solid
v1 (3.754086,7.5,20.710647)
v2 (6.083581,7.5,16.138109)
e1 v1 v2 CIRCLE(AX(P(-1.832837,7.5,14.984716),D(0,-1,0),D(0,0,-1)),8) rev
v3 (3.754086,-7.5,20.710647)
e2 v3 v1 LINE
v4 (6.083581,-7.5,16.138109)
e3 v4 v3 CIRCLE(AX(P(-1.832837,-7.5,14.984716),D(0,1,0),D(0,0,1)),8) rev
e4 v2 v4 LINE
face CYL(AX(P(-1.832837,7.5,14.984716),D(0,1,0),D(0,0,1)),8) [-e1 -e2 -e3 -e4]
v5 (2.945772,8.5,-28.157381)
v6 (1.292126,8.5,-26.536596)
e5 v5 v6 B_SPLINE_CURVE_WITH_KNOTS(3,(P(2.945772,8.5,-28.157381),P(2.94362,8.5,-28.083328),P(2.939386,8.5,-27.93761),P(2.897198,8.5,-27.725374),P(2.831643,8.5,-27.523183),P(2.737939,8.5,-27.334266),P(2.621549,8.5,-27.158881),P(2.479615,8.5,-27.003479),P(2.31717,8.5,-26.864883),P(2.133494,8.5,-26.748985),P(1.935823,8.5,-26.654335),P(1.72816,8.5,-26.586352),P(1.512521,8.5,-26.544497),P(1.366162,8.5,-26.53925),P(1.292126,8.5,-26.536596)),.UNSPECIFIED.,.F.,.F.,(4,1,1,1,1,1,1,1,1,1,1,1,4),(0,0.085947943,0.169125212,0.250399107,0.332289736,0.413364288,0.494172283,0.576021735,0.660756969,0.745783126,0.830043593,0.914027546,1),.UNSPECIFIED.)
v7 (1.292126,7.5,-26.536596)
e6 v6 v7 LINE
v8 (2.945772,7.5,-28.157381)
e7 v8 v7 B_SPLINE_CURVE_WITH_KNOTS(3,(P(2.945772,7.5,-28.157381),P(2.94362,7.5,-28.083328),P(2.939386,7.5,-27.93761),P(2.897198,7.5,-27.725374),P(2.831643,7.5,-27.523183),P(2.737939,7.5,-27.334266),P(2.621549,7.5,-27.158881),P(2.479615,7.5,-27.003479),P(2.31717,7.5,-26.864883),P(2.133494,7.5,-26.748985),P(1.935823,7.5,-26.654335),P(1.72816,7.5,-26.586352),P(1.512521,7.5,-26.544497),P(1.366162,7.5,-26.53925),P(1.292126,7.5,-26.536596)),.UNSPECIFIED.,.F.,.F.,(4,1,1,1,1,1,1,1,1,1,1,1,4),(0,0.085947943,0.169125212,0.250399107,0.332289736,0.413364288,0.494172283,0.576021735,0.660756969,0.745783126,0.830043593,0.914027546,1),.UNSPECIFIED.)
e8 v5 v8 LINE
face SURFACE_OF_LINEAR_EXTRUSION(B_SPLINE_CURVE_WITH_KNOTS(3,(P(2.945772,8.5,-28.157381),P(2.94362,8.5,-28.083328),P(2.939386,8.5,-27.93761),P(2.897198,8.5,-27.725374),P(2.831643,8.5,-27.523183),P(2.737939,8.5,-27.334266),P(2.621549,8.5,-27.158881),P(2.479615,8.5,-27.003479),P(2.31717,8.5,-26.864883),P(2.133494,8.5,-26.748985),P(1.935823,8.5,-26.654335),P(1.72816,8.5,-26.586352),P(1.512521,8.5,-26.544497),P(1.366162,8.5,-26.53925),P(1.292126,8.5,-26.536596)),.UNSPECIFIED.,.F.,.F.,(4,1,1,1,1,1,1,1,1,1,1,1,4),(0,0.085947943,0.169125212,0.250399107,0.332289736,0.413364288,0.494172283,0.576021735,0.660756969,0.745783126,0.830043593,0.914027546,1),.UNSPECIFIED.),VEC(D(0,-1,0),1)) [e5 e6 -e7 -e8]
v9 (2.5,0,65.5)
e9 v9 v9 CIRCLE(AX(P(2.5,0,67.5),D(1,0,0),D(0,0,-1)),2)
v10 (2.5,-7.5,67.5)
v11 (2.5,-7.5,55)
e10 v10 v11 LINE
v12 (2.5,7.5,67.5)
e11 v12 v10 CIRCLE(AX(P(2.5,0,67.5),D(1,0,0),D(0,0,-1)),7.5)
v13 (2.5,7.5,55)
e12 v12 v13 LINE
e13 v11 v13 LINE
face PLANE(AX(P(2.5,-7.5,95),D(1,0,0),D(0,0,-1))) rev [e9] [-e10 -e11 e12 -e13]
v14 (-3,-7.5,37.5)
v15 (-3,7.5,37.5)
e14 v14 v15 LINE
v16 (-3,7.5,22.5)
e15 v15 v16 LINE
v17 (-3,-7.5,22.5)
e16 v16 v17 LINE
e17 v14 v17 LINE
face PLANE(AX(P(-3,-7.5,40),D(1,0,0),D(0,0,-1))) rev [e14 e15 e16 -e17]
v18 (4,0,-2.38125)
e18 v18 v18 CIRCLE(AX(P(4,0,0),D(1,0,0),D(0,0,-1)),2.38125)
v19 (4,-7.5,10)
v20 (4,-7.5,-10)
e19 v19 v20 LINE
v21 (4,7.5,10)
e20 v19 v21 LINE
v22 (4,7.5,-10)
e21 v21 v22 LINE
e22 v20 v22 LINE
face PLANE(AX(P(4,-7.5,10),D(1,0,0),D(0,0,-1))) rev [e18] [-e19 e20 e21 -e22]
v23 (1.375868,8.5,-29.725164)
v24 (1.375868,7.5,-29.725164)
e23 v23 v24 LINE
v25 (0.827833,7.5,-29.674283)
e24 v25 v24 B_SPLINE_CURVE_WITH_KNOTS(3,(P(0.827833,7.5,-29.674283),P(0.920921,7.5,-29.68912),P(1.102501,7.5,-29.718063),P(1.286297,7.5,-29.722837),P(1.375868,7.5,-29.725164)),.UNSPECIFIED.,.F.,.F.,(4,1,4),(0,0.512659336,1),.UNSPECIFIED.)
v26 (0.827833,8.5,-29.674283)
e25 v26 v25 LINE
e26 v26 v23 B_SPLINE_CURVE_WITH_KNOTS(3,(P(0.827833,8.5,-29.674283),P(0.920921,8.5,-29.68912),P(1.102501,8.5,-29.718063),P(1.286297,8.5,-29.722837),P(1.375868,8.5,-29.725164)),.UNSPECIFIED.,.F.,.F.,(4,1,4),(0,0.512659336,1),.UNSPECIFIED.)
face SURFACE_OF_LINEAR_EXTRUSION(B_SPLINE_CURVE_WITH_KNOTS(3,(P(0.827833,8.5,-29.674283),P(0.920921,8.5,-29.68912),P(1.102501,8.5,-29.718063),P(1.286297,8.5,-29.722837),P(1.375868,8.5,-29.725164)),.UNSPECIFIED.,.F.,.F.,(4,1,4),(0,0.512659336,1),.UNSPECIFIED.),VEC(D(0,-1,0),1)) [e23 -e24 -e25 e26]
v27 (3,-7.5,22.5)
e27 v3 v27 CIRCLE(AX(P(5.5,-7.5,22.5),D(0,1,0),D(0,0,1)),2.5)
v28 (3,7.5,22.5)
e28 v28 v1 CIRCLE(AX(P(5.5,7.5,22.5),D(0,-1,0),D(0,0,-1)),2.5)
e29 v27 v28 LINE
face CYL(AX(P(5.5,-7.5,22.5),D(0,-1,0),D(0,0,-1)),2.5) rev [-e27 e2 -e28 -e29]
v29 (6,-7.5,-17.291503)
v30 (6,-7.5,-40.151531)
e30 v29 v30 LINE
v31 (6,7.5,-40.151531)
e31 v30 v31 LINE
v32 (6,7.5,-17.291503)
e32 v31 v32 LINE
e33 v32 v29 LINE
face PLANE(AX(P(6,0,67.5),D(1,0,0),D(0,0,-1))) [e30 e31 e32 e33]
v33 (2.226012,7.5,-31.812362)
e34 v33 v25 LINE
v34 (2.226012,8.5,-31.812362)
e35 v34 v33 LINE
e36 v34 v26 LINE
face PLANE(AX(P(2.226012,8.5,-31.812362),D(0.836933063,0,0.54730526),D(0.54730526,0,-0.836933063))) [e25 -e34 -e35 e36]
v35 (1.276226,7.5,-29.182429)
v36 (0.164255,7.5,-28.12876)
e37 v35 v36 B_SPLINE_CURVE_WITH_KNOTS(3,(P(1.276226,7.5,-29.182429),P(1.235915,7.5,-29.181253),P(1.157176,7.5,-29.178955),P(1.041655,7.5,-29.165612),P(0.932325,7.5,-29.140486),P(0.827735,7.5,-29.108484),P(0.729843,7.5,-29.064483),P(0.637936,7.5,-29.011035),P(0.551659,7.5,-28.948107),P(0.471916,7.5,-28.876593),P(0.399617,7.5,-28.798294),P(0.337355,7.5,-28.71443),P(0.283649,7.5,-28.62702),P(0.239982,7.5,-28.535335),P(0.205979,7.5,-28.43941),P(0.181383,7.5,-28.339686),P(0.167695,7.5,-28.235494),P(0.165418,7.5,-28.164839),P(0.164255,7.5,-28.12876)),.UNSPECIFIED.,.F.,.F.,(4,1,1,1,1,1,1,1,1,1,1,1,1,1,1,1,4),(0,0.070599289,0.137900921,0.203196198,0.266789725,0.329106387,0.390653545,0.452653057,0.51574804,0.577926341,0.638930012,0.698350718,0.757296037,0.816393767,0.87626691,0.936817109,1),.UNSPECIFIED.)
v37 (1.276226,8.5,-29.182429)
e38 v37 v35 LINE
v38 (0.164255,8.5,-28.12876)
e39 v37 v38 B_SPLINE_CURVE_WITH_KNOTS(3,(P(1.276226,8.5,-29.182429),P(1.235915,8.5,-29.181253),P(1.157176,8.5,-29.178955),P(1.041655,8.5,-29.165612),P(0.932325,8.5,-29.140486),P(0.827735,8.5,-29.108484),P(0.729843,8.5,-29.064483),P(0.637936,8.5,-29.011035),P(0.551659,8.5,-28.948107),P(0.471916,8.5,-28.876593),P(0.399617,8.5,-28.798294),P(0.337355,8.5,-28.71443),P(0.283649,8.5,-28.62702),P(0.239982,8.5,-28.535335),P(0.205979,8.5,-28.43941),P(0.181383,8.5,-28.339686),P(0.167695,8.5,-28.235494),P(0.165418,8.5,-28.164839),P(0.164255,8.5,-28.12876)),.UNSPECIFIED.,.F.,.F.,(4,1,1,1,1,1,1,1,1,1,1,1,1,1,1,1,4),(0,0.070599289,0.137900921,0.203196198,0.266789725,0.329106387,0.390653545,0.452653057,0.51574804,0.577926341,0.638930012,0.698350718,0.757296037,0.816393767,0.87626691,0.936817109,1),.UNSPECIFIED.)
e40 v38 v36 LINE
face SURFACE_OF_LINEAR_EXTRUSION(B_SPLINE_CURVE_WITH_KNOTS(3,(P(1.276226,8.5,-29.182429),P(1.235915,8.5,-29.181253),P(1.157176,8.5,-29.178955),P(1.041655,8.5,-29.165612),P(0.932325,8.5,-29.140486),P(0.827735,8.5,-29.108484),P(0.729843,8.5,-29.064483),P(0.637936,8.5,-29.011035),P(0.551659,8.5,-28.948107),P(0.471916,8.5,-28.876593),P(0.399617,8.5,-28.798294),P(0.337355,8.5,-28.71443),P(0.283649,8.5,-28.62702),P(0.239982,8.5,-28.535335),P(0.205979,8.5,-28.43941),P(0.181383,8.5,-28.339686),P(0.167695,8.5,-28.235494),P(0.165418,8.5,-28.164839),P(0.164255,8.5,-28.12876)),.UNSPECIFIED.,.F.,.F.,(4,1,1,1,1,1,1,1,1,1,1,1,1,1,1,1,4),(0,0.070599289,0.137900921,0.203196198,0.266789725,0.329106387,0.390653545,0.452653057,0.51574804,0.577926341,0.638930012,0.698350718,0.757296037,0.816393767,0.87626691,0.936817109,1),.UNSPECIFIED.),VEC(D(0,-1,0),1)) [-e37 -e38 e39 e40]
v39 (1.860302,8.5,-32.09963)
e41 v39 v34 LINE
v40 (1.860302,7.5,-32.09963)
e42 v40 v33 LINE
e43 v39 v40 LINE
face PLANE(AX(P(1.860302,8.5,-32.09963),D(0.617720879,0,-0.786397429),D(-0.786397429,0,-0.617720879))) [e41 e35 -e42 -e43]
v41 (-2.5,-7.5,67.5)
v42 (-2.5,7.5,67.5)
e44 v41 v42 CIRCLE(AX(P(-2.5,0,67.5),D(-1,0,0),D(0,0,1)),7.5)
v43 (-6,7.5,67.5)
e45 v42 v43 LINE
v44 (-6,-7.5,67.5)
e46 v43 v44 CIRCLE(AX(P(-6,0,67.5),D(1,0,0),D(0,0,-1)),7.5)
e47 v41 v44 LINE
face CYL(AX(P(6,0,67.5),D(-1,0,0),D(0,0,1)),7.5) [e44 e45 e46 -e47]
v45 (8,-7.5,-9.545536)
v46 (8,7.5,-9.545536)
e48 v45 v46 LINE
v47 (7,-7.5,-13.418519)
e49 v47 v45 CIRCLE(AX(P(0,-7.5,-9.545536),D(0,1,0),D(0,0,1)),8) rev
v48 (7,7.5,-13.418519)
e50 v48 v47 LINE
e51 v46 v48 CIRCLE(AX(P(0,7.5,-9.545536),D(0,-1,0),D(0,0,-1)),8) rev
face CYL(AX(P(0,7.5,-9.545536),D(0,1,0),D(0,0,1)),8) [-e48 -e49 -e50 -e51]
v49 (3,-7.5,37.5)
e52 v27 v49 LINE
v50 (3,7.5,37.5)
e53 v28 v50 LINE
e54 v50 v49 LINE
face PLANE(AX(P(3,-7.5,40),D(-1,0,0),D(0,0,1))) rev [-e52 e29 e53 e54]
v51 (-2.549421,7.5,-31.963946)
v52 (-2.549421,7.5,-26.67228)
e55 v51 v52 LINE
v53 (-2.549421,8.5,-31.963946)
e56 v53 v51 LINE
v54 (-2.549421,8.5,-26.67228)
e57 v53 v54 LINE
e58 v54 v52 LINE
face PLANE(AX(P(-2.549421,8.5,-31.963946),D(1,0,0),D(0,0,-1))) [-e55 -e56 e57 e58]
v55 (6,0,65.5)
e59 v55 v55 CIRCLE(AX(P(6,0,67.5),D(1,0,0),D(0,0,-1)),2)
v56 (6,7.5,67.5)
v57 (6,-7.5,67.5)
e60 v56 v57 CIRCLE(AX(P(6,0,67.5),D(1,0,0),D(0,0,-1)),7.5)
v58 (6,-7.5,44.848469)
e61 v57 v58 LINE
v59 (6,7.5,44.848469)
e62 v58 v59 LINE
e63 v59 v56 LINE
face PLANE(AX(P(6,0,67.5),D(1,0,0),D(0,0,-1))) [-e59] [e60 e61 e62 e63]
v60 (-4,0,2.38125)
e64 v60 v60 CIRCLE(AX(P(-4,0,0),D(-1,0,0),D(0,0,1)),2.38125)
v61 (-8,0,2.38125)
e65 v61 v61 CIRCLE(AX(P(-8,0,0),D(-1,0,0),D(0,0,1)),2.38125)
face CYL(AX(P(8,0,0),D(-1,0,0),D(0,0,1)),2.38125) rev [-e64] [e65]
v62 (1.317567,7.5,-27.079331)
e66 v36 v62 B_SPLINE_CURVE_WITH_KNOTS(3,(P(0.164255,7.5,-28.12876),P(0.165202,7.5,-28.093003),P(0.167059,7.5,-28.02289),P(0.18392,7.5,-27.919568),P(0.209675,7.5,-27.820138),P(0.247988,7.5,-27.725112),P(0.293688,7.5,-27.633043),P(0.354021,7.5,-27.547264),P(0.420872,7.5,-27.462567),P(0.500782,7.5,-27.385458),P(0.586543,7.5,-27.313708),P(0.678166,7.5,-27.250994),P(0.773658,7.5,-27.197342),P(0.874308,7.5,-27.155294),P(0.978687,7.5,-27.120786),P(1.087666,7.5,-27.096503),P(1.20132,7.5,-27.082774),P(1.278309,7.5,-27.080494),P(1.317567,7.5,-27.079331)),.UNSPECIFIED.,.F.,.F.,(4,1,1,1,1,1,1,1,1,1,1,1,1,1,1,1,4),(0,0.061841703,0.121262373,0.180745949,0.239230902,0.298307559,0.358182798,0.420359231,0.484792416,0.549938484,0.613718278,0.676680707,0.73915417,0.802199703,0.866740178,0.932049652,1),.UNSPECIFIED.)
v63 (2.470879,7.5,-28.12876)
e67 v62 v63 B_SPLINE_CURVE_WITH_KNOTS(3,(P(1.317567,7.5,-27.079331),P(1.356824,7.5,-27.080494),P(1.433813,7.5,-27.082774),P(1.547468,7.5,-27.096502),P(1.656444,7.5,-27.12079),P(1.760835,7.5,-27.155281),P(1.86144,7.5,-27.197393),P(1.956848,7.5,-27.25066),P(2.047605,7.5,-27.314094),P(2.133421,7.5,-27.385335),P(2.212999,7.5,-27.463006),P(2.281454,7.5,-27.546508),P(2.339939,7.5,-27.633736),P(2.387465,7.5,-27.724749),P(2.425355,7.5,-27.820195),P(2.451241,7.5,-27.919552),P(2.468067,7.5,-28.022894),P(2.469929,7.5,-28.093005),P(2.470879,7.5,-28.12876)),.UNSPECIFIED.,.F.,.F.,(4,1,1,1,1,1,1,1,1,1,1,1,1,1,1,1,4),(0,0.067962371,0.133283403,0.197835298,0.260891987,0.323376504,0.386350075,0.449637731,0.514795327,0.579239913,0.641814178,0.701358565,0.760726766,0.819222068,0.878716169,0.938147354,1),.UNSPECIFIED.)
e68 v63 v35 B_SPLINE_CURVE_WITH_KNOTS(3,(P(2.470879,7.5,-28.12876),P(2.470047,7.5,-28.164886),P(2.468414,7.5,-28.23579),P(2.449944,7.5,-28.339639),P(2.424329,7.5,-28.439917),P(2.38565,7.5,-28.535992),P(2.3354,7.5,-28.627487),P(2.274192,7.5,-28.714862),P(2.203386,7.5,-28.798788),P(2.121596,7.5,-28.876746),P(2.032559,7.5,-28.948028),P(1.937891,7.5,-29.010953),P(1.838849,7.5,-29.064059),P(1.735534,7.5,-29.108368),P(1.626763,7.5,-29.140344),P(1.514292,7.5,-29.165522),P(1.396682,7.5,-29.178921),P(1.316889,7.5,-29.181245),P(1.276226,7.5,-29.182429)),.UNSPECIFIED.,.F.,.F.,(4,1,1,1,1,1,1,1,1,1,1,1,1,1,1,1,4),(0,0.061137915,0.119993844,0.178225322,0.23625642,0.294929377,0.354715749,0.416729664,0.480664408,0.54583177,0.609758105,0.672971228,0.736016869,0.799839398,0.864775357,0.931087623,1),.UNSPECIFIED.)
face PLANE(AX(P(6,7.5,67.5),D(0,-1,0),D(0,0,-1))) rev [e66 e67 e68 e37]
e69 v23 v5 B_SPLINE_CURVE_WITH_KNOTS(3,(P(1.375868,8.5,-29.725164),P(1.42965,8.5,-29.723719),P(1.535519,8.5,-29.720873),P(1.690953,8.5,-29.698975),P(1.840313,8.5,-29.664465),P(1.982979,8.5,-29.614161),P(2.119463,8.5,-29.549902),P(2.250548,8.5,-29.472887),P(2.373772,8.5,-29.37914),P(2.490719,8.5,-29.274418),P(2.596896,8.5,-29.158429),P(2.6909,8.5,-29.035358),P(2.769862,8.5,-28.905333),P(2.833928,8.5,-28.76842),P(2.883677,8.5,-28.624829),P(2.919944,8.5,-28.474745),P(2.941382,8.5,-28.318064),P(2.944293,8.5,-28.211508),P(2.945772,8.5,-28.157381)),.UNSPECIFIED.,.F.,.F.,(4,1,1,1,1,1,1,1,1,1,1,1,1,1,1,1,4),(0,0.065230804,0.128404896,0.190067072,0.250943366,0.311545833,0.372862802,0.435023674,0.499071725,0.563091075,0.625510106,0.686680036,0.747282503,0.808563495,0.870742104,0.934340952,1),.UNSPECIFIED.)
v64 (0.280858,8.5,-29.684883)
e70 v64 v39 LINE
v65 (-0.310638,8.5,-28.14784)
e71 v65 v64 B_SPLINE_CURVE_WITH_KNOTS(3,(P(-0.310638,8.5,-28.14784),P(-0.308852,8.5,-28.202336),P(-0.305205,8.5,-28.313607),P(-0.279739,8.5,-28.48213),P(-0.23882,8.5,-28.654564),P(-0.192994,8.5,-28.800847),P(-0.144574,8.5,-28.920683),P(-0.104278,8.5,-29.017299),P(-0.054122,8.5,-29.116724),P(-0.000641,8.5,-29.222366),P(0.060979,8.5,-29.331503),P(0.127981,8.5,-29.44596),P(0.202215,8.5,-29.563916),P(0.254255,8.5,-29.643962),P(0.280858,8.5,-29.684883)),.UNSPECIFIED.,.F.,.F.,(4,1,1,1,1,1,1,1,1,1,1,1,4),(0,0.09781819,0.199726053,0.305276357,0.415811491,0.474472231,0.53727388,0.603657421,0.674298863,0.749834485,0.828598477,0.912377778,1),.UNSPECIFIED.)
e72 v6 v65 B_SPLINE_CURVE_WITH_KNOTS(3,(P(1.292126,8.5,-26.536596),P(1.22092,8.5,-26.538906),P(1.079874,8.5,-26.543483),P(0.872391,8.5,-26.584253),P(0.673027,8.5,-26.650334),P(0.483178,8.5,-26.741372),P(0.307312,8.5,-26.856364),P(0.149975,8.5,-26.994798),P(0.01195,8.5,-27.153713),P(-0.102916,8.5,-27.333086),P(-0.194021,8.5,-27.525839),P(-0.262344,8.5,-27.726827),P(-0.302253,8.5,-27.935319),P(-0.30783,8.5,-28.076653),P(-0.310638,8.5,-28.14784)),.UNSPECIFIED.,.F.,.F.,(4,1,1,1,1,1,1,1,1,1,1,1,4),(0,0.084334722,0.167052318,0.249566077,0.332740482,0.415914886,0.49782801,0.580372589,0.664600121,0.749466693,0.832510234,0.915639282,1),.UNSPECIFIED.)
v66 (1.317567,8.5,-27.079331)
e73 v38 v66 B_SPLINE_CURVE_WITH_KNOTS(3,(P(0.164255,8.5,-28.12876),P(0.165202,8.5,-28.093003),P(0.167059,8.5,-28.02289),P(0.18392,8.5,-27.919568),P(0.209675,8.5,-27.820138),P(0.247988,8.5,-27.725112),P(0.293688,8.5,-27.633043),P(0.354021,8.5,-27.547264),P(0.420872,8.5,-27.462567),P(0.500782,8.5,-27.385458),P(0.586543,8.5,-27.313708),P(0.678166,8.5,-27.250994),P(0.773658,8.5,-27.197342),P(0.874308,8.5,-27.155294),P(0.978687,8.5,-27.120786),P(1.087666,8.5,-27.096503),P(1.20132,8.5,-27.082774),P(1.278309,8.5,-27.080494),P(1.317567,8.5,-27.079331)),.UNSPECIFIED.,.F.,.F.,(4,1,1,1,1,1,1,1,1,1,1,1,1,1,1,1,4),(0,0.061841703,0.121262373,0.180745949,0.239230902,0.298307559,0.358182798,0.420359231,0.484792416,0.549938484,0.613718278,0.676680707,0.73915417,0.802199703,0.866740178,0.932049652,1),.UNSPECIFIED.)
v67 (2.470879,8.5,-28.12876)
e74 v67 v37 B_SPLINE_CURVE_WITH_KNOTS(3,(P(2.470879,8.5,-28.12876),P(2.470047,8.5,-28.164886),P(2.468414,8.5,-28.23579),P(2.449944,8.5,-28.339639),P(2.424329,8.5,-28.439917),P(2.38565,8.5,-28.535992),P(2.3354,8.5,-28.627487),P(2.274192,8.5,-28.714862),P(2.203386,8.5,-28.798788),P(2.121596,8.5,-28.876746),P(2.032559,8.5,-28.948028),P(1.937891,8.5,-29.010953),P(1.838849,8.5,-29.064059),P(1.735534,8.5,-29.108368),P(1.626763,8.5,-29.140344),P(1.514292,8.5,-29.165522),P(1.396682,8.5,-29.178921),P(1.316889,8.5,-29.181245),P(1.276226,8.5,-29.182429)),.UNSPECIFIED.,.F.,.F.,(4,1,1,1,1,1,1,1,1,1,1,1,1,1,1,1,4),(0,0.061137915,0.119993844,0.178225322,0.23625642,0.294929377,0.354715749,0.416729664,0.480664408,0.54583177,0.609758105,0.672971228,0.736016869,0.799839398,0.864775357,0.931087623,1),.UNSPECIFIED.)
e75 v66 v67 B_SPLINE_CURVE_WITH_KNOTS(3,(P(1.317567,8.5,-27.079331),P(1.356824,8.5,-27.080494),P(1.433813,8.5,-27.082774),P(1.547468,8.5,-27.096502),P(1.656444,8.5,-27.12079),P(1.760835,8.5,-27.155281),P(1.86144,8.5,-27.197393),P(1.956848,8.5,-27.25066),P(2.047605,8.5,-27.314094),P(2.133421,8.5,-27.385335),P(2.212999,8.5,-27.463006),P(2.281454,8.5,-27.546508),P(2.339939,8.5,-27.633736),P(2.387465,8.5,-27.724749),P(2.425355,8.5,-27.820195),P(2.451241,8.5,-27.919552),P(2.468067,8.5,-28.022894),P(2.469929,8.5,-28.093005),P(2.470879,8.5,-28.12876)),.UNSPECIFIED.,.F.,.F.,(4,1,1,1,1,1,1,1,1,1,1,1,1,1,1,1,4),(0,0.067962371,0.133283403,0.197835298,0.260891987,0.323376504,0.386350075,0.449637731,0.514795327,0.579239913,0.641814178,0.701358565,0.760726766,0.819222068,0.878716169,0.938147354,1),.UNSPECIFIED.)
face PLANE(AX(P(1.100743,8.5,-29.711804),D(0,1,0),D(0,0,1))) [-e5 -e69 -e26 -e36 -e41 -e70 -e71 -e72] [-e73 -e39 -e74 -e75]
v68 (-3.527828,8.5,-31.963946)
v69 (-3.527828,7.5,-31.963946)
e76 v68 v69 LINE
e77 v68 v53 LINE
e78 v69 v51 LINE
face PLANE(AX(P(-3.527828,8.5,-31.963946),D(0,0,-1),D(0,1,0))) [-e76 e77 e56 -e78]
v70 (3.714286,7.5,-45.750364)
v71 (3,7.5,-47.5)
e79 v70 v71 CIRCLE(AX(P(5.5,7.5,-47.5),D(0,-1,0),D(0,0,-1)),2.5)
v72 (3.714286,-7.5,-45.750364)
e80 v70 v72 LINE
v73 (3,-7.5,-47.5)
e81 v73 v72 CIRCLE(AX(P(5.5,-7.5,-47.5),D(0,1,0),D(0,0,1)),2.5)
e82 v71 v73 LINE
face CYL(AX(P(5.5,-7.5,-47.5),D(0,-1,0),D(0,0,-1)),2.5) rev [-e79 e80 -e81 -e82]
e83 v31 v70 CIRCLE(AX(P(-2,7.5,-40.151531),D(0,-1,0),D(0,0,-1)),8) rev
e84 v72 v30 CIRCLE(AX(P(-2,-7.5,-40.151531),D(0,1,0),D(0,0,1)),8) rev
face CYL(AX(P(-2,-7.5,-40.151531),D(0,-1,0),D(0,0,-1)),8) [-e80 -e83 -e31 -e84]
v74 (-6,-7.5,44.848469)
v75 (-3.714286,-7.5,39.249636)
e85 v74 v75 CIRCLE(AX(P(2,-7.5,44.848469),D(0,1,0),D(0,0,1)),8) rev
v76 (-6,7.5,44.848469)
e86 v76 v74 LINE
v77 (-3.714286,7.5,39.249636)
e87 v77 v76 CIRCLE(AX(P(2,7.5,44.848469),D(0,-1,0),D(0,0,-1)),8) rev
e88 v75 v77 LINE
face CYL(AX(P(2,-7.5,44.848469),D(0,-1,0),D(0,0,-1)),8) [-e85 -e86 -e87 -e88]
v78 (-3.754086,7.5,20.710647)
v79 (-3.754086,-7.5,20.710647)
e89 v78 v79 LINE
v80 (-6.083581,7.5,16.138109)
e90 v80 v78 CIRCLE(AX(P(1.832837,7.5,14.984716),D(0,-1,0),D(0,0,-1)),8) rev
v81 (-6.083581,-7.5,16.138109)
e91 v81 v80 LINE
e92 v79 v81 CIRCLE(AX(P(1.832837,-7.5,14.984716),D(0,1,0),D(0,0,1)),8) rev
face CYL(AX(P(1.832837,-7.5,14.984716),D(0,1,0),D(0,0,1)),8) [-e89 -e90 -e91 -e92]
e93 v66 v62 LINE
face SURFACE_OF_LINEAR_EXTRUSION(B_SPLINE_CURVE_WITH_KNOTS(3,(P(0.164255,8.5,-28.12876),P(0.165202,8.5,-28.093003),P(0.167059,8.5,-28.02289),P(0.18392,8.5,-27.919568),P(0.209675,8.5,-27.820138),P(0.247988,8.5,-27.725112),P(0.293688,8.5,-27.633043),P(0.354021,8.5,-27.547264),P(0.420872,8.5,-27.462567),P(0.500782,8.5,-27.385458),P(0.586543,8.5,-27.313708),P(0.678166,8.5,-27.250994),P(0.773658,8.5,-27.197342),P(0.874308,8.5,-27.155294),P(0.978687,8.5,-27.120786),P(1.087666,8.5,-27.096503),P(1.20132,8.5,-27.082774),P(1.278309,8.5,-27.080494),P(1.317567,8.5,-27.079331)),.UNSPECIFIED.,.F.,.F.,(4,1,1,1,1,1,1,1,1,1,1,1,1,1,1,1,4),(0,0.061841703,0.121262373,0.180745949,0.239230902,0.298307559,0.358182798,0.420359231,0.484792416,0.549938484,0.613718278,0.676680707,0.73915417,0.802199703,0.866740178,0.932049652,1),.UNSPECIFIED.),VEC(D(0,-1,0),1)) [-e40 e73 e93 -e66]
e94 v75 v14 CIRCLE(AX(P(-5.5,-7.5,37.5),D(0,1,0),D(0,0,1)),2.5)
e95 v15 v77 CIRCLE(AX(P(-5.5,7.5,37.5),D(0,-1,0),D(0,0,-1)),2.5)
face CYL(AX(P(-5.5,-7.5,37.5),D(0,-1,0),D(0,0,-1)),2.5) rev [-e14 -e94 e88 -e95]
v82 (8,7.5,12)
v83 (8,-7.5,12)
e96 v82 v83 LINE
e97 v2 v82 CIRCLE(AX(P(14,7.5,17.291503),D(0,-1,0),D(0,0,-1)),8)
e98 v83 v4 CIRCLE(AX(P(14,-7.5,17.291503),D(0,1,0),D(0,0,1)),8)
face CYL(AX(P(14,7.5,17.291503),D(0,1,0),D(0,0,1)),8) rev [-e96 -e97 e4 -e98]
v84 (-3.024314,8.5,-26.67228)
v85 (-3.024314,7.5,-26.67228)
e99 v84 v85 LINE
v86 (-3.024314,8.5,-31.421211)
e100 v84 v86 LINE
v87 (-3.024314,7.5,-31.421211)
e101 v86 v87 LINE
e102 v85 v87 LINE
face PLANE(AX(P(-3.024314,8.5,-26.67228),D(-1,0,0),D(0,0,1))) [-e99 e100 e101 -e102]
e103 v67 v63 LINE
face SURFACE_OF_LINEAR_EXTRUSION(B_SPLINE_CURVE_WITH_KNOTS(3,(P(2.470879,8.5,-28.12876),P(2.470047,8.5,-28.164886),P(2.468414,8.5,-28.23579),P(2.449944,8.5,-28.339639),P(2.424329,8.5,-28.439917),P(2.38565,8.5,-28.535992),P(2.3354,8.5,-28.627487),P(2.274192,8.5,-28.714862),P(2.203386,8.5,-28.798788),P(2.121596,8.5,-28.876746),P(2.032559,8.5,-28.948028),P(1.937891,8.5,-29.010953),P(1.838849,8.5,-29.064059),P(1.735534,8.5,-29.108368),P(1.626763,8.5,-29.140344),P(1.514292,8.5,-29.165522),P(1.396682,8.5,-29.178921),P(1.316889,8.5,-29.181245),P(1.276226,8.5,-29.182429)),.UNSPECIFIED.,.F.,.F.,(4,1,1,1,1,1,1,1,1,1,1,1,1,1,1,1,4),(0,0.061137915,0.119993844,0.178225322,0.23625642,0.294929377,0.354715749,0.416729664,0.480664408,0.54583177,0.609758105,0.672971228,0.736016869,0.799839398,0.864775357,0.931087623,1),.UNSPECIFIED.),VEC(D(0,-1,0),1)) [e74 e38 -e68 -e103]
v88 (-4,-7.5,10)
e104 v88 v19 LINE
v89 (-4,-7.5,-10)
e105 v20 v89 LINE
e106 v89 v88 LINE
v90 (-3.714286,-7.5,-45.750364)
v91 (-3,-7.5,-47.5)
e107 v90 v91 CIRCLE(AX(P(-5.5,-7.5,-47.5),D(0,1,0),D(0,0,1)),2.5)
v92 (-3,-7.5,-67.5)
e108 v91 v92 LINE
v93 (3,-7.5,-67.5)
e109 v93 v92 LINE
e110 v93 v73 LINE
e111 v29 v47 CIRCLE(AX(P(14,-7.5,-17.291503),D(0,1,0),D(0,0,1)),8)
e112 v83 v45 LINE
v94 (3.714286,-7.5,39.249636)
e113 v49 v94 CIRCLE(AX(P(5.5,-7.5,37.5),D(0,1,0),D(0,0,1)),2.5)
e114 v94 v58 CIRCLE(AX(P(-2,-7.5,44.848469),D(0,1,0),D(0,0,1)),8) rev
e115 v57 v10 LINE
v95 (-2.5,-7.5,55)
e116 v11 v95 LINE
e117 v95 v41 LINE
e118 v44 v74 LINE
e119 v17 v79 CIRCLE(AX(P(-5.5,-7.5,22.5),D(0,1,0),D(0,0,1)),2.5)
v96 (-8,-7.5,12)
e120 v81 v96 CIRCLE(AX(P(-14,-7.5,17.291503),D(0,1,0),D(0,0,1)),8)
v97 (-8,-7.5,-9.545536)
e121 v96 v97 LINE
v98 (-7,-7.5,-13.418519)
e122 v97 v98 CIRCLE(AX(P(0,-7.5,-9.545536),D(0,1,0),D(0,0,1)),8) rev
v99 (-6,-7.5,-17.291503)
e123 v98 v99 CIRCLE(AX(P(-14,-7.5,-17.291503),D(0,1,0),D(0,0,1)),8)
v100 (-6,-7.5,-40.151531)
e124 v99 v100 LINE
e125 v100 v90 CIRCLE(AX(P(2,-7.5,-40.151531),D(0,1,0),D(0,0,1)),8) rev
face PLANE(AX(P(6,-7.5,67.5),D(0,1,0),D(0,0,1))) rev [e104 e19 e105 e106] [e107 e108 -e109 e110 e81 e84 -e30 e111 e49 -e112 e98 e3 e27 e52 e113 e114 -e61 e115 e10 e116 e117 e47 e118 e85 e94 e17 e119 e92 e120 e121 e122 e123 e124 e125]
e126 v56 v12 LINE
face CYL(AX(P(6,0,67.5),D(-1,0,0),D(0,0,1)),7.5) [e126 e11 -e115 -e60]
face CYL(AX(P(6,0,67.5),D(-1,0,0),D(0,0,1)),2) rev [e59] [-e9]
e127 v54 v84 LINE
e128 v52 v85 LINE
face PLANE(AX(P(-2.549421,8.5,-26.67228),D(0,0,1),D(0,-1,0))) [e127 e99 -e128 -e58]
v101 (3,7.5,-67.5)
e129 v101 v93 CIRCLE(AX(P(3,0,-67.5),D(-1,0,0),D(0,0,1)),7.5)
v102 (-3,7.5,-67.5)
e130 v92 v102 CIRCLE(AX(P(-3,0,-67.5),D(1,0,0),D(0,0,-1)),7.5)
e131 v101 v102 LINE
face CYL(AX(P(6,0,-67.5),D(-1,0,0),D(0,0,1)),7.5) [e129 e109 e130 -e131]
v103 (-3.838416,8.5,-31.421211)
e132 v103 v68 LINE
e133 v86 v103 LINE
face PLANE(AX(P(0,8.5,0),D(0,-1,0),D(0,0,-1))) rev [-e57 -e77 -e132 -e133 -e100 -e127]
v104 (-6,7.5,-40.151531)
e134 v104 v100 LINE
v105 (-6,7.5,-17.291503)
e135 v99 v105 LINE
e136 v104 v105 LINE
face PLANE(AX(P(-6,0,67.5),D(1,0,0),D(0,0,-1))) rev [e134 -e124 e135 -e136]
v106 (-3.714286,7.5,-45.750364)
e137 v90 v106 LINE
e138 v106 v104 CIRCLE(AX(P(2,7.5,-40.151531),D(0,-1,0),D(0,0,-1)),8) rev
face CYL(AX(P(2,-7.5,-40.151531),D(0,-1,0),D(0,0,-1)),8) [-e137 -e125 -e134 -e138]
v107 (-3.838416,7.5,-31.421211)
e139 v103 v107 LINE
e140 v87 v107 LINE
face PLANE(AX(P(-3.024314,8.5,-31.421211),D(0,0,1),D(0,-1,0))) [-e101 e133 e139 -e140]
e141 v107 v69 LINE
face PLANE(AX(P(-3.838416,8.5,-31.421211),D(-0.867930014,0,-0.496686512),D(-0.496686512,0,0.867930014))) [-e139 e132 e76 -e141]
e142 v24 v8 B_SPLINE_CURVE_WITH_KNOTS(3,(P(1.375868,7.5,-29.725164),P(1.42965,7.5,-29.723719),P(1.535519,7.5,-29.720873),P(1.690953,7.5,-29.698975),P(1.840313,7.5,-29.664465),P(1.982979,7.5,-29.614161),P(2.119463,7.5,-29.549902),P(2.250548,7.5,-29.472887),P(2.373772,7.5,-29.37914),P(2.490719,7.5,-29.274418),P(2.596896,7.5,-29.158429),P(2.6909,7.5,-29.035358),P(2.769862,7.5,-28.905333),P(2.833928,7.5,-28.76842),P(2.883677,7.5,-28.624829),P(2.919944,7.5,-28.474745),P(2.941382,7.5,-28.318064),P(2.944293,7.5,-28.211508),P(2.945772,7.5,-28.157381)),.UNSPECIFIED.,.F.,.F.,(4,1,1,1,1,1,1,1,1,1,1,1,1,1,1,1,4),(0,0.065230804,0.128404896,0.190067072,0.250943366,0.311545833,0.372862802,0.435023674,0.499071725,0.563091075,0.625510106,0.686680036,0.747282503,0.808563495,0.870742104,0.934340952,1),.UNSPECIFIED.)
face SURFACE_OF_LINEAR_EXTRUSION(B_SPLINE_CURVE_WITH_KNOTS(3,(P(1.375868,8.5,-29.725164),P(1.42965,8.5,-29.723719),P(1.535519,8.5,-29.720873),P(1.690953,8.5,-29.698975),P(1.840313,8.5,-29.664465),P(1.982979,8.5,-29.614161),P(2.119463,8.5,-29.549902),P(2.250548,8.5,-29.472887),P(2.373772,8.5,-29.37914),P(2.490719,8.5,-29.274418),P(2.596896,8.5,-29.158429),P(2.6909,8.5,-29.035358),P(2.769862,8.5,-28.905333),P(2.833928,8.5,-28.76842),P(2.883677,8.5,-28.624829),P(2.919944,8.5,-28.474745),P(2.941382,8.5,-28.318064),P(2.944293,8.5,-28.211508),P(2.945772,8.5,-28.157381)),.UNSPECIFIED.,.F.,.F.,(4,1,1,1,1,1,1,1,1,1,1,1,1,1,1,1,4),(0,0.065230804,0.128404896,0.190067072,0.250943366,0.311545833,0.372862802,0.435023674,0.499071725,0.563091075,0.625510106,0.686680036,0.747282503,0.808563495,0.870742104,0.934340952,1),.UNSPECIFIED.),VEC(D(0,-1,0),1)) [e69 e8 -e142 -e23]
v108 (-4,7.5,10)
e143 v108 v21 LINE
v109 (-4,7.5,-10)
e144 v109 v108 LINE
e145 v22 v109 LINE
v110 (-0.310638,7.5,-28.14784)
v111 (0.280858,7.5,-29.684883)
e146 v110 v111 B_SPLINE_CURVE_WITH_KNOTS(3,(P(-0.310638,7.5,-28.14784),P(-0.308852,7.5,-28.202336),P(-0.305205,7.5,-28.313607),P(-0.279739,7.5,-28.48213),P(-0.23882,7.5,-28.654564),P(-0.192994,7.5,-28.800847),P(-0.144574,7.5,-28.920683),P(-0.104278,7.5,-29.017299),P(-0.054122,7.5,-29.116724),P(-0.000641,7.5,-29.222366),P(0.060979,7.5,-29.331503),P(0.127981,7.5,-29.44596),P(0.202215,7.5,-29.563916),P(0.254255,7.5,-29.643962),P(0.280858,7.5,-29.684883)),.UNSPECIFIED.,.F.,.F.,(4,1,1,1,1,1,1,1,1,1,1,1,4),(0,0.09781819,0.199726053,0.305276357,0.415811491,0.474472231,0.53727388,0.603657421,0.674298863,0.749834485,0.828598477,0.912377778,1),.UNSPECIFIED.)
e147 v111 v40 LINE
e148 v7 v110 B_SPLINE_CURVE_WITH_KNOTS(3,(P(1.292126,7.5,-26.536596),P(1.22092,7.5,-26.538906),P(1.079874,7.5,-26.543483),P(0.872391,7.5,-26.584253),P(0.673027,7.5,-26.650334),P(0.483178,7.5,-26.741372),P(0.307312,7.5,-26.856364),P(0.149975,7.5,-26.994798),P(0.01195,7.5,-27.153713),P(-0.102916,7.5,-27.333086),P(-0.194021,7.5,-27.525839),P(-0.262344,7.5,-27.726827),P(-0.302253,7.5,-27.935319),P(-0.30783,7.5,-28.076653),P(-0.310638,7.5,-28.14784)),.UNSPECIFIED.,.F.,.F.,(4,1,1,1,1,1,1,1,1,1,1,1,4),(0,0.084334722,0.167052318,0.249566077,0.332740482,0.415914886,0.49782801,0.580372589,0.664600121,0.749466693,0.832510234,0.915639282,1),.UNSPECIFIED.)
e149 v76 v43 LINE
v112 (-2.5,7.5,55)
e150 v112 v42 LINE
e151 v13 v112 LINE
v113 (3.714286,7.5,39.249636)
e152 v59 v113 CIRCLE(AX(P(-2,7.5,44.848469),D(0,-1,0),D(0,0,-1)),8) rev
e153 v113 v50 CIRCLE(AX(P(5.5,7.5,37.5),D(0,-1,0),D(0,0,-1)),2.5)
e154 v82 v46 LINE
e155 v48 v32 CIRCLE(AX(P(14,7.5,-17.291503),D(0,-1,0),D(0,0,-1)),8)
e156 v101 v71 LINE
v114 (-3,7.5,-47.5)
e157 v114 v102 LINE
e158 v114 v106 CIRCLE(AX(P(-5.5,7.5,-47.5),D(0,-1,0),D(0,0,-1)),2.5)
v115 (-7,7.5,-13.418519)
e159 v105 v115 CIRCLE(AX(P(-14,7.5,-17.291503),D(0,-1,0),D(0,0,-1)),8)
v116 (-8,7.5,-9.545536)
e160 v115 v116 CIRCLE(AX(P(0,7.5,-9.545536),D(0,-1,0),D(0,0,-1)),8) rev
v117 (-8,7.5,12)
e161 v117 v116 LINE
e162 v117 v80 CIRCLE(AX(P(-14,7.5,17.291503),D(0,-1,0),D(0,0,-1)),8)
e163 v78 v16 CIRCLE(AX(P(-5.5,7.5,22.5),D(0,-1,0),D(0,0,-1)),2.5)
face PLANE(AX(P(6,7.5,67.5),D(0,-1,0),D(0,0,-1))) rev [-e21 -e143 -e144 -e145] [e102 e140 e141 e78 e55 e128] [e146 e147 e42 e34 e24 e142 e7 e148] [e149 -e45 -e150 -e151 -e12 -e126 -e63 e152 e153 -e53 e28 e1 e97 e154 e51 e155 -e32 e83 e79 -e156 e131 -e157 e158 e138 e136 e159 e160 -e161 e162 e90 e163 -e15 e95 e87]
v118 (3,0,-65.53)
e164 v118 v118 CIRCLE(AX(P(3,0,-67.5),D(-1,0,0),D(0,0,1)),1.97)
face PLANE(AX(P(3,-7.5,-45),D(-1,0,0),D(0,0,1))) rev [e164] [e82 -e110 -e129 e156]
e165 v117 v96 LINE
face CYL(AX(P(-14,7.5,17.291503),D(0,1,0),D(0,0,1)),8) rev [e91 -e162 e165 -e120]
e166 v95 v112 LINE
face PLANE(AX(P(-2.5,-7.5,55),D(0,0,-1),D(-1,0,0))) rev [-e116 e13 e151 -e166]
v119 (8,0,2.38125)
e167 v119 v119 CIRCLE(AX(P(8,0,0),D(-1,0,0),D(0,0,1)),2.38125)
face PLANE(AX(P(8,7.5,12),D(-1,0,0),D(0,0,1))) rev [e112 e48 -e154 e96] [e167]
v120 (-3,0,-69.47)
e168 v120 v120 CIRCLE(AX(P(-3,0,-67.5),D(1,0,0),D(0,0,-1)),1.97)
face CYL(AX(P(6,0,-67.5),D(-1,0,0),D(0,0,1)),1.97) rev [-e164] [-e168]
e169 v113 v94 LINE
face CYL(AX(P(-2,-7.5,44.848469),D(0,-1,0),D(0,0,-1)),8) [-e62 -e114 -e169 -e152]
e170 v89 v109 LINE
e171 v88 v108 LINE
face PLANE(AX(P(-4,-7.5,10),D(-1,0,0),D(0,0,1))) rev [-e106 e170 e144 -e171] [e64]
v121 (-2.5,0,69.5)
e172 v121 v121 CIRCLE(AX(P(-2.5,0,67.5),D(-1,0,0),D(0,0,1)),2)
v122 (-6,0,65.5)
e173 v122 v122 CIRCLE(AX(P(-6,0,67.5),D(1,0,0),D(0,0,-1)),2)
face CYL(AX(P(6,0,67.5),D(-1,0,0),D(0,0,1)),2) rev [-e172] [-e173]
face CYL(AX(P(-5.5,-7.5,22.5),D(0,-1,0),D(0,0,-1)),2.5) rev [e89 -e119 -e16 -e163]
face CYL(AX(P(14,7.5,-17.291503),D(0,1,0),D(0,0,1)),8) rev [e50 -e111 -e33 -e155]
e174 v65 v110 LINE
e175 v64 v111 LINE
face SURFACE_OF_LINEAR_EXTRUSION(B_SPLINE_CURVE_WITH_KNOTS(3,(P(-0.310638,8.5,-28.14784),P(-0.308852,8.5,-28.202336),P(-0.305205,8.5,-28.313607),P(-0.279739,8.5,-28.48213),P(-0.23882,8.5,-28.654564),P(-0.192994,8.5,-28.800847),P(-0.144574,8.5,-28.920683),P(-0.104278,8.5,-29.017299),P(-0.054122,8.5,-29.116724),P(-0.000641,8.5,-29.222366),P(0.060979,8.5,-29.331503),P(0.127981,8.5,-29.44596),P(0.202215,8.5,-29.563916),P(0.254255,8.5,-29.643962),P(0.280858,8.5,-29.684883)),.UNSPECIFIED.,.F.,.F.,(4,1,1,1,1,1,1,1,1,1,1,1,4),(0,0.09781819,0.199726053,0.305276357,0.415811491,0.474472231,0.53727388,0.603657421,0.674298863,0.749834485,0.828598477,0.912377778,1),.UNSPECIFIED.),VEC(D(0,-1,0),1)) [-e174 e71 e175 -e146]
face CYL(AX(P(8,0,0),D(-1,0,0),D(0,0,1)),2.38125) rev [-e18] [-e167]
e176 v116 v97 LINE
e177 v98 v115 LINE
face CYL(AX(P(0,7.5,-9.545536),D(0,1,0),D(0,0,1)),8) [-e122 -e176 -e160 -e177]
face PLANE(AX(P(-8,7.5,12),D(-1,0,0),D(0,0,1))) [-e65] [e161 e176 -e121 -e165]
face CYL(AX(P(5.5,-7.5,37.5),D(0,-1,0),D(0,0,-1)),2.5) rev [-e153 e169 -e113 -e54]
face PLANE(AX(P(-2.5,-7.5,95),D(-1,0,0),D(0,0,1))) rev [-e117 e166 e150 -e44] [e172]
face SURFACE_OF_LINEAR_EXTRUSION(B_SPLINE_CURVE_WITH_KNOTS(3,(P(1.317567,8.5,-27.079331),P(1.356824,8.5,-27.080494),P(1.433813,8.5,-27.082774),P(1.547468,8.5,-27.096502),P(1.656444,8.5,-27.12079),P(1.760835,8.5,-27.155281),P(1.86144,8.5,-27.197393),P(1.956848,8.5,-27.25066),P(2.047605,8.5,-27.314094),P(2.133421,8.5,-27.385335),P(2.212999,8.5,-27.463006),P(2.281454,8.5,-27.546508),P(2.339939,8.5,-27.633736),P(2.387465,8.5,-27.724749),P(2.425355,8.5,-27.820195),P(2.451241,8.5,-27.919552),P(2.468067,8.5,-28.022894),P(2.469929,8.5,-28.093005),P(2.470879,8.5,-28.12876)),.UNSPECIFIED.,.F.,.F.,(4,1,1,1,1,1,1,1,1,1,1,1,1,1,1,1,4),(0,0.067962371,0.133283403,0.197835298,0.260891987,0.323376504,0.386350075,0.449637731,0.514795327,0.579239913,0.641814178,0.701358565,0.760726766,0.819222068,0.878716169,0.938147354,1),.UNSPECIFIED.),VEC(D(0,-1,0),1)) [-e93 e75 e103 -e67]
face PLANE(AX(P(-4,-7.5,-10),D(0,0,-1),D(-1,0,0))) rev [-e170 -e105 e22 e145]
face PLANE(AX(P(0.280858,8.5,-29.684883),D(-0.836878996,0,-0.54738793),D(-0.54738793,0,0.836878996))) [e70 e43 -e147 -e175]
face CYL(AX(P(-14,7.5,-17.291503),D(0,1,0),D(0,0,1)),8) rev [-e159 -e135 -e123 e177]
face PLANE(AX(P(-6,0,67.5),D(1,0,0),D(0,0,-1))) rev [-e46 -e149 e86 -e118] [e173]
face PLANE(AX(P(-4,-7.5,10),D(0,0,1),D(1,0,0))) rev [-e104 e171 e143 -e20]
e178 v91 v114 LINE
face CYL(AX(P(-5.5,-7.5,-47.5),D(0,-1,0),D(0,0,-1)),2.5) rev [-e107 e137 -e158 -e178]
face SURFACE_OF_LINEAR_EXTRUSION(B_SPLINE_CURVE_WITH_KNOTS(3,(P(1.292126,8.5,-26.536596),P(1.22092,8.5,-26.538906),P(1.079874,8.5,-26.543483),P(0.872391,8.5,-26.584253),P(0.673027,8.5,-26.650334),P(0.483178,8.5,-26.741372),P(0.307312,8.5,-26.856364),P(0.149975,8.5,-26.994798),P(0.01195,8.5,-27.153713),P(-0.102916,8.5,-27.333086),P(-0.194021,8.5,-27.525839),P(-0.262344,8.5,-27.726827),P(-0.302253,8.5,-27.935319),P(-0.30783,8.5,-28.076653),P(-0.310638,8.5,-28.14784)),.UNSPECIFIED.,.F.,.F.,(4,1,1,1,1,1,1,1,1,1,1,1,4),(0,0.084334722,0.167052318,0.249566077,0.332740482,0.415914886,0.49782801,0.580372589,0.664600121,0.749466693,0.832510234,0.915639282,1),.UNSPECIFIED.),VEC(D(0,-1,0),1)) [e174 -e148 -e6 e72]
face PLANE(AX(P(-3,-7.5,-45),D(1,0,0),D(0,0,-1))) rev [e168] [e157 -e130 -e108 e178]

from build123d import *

# Parameters (mm, degrees)
SKETCH1_R           = 2
SKETCH1_R_2         = 2.38125
SKETCH1_R_3         = 1.97
BASE_DEPTH          = 6
ALL_CUTS_DEPTH      = 76.612498967
ALL_CUTS_DEPTH_BACK = 76.612498967
SKETCH2_W           = 5
SKETCH2_H           = 40
SKETCH2_W_2         = 6
SKETCH2_H_2         = 20
SKETCH2_H_3         = 30
SKETCH2_W_3         = 8
SKETCH3_W           = 16
SKETCH3_H           = 24
SKETCH3_W_2         = 8
SKETCH3_H_2         = 20
BOSS_EXTRUDE1_DEPTH = 15
SKETCH4_R           = 2.38125
CUT_EXTRUDE1_DEPTH  = 78.053552806
FILLET1_R           = 2.5
FILLET2_R           = 8
FILLET3_R           = 8
BOSS_EXTRUDE2_DEPTH = 1


with BuildPart() as part:
    # Sketch1 → BASE (new, symmetric)
    with BuildSketch(Plane(origin=(0, 0, 0), x_dir=(0, 0, -1), z_dir=(1, 0, 0))):
        with BuildLine():
            Line((-67.5, 7.5), (67.5, 7.5))
            ThreePointArc((67.5, 7.5), (75, 0), (67.5, -7.5))
            Line((67.5, -7.5), (-67.5, -7.5))
            ThreePointArc((-67.5, -7.5), (-75, 0), (-67.5, 7.5))
        make_face()
        with Locations((-67.5, 0)):
            Circle(SKETCH1_R, mode=Mode.SUBTRACT)
        Circle(SKETCH1_R_2, mode=Mode.SUBTRACT)
        with Locations((67.5, 0)):
            Circle(SKETCH1_R_3, mode=Mode.SUBTRACT)
    extrude(amount=BASE_DEPTH, both=True)

    # Sketch2 → All_Cuts (cut, two sides: drawn at the far end of the back side and taken through both)
    with BuildSketch(Plane(origin=(0, 0, 0), x_dir=(1, 0, 0), z_dir=(0, 1, 0)).offset(-ALL_CUTS_DEPTH_BACK)):
        with Locations((0, -75)):
            Rectangle(SKETCH2_W, SKETCH2_H)
        with Locations((-6, -30)):
            Rectangle(SKETCH2_W_2, SKETCH2_H_2)
        with Locations((6, -30)):
            Rectangle(SKETCH2_W_2, SKETCH2_H_2)
        with Locations((6, 60)):
            Rectangle(SKETCH2_W_2, SKETCH2_H_3)
        with Locations((-6, 60)):
            Rectangle(SKETCH2_W_2, SKETCH2_H_3)
        Rectangle(SKETCH2_W_3, SKETCH2_H_2)
    extrude(amount=ALL_CUTS_DEPTH + ALL_CUTS_DEPTH_BACK, mode=Mode.SUBTRACT)

    # Sketch3 → Boss-Extrude1 (add, through all)
    with BuildSketch(Plane.XZ.offset(7.5)):
        Rectangle(SKETCH3_W, SKETCH3_H)
        Rectangle(SKETCH3_W_2, SKETCH3_H_2, mode=Mode.SUBTRACT)
    extrude(amount=-BOSS_EXTRUDE1_DEPTH)

    # Sketch4 → Cut-Extrude1 (cut, through all)
    with BuildSketch(Plane.ZY.offset(8)):
        Circle(SKETCH4_R)
    extrude(amount=-CUT_EXTRUDE1_DEPTH, mode=Mode.SUBTRACT)

    # Fillet1
    fillet1_edges = [part.edges().sort_by_distance(p)[0] for p in [
        (3, 0, 20),
        (3, 0, 40),
        (-3, 0, 40),
        (-3, 0, 20),
        (3, 0, -45),
        (-3, 0, -45),
    ]]
    fillet(fillet1_edges, radius=FILLET1_R)

    # Fillet2
    # the kernel refuses this fillet: 8 mm, written as the material it adds along each edge
    with BuildSketch(Plane(origin=(-6, -7.5, -12), x_dir=(0, 0, -1), z_dir=(0, 1, 0))) as fillet2_piece_1:
        with BuildLine():
            CenterArc((5.291502622, 8), FILLET2_R, 228.590377891, 41.409622109)
            Line((0, 2), (-0.105830052, 1.88))
            ThreePointArc((-0.105830052, 1.88), (-0.16, 1), (-0.16, 0))
            Line((-0.16, 0), (0, -0.16))
            Line((0, -0.16), (5.291502622, -0.16))
            Line((5.291502622, -0.16), (5.291502622, 0))
        make_face()
    extrude(amount=15)
    with BuildSketch(Plane(origin=(6, -7.5, -12), x_dir=(1, 0, 0), z_dir=(0, 1, 0))) as fillet2_piece_2:
        with BuildLine():
            CenterArc((8, 5.291502622), FILLET2_R, 180, 41.409622109)
            Line((0, 5.291502622), (-0.16, 5.291502622))
            Line((-0.16, 5.291502622), (-0.16, 0))
            Line((-0.16, 0), (0, -0.16))
            ThreePointArc((0, -0.16), (1, -0.16), (1.88, -0.105830052))
            Line((1.88, -0.105830052), (2, 0))
        make_face()
    extrude(amount=15)
    with BuildSketch(Plane(origin=(6, 7.5, 12), x_dir=(0, 0, 1), z_dir=(0, -1, 0))) as fillet2_piece_3:
        with BuildLine():
            CenterArc((5.291502622, -8), FILLET2_R, 90, 41.409622109)
            Line((0, -2), (-0.105830052, -1.88))
            ThreePointArc((-0.105830052, -1.88), (-0.16, -1), (-0.16, 0))
            Line((-0.16, 0), (0, 0.16))
            Line((0, 0.16), (5.291502622, 0.16))
            Line((5.291502622, 0.16), (5.291502622, 0))
        make_face()
    extrude(amount=15)
    with BuildSketch(Plane(origin=(-6, 7.5, 12), x_dir=(-1, 0, 0), z_dir=(0, -1, 0))) as fillet2_piece_4:
        with BuildLine():
            CenterArc((8, -5.291502622), FILLET2_R, 138.590377891, 41.409622109)
            Line((0, -5.291502622), (-0.16, -5.291502622))
            Line((-0.16, -5.291502622), (-0.16, 0))
            Line((-0.16, 0), (0, 0.16))
            ThreePointArc((0, 0.16), (1, 0.16), (1.88, 0.105830052))
            Line((1.88, 0.105830052), (2, 0))
        make_face()
    extrude(amount=15)

    # Fillet3
    fillet3_edges = [part.edges().sort_by_distance(p)[0] for p in [
        (8, 0, -12),
        (-8, 0, -12),
        (-6, 0, 20),
        (6, 0, 20),
        (-6, 0, -45),
        (6, 0, -45),
        (6, 0, 40),
        (-6, 0, 40),
    ]]
    fillet(fillet3_edges, radius=FILLET3_R)

    # Sketch5 → Boss-Extrude2 (add)
    # profile 1 of 2: a face of its own
    with BuildSketch(Plane(origin=(0, 7.5, 0), x_dir=(1, 0, 0), z_dir=(0, 1, 0))):
        Polygon((-3.52782764, 31.96394622), (-2.549420522, 31.96394622), (-2.549420522, 26.672279553), (-3.024313685, 26.672279553), (-3.024313685, 31.421211177), (-3.838416249, 31.421211177), align=None)
    # profile 2 of 2: a face of its own
    with BuildSketch(Plane(origin=(0, 7.5, 0), x_dir=(1, 0, 0), z_dir=(0, 1, 0))):
        with BuildLine():
            Line((1.8603017, 32.09962998), (2.226011836, 31.812362018))
            Line((2.226011836, 31.812362018), (0.827833083, 29.674282758))
            add(Edge.make_bspline(
                [(0.827833083, 29.674282758), (0.920921478, 29.689120381), (1.102500918, 29.718062841), (1.286296979, 29.722837354), (1.375868273, 29.725164168)],
                knots=[0, 0, 0, 0, 1.025318673, 2, 2, 2, 2], degree=3))
            add(Edge.make_bspline(
                [(1.375868273, 29.725164168), (1.4296505, 29.723718619), (1.535519212, 29.720873097), (1.690953306, 29.698974894), (1.840312769, 29.664465498), (1.98297854, 29.614161016), (2.119462691, 29.549901504), (2.250548456, 29.472886784), (2.373771734, 29.3791401), (2.49071935, 29.274418084), (2.596896033, 29.15842931), (2.690900307, 29.035358241), (2.769862242, 28.9053331), (2.833927576, 28.768419743), (2.883676619, 28.624829219), (2.919943654, 28.474745247), (2.941381848, 28.318064331), (2.944293006, 28.211508043), (2.945771785, 28.157380715)],
                knots=[0, 0, 0, 0, 1.04369286, 2.054478336, 3.041073146, 4.015093852, 4.984733326, 5.965804835, 6.960378782, 7.985147595, 9.009457201, 10.008161701, 10.986880575, 11.956520048, 12.937015923, 13.931873656, 14.949455224, 16, 16, 16, 16], degree=3))
            add(Edge.make_bspline(
                [(2.945771785, 28.157380715), (2.943620186, 28.083328067), (2.939386349, 27.937609982), (2.897198467, 27.725373771), (2.831642813, 27.523182944), (2.737938693, 27.334265649), (2.621548661, 27.158880812), (2.479614682, 27.003478977), (2.31717036, 26.864882611), (2.133493892, 26.748985104), (1.935822982, 26.654335253), (1.728159843, 26.586352089), (1.512521181, 26.54449732), (1.366161833, 26.539250099), (1.292125952, 26.536595792)],
                knots=[0, 0, 0, 0, 1.031375318, 2.029502543, 3.004789286, 3.987476834, 4.960371455, 5.9300674, 6.912260825, 7.929083631, 8.949397511, 9.960523116, 10.96833055, 12, 12, 12, 12], degree=3))
            add(Edge.make_bspline(
                [(1.292125952, 26.536595792), (1.220920226, 26.538906294), (1.07987415, 26.543482993), (0.872391235, 26.584252923), (0.673026911, 26.6503339), (0.483177966, 26.741372154), (0.307312278, 26.856364429), (0.149974946, 26.994797875), (0.011950478, 27.153713376), (-0.102915914, 27.333086282), (-0.194021377, 27.525838956), (-0.26234424, 27.726827276), (-0.302252846, 27.935318915), (-0.307829593, 28.076653494), (-0.310638471, 28.14784045)],
                knots=[0, 0, 0, 0, 1.012016664, 2.004627821, 2.994792927, 3.992885782, 4.990978636, 5.973936114, 6.964471063, 7.975201453, 8.993600317, 9.990122807, 10.98767138, 12, 12, 12, 12], degree=3))
            add(Edge.make_bspline(
                [(-0.310638471, 28.14784045), (-0.308852239, 28.202336427), (-0.305205094, 28.3136068), (-0.279739491, 28.482129795), (-0.238820099, 28.654564168), (-0.192993894, 28.800847294), (-0.144574221, 28.920683167), (-0.10427812, 29.017299159), (-0.054122197, 29.116723638), (-0.000641014, 29.222365921), (0.060979491, 29.331503421), (0.127980532, 29.445960159), (0.202214528, 29.563915835), (0.254254536, 29.643962416), (0.280857923, 29.684883052)],
                knots=[0, 0, 0, 0, 1.173818275, 2.396712641, 3.66331629, 4.989737886, 5.693666774, 6.447286557, 7.243889047, 8.091586357, 8.998013824, 9.943181721, 10.948533338, 12, 12, 12, 12], degree=3))
            Line((0.280857923, 29.684883052), (1.8603017, 32.09962998))
        make_face()
        with BuildLine():
            add(Edge.make_bspline(
                [(1.276225511, 29.182429126), (1.235914736, 29.181252798), (1.157176083, 29.178955087), (1.041655349, 29.165612147), (0.9323246, 29.140485703), (0.827735362, 29.108484225), (0.729843001, 29.06448317), (0.637936065, 29.011034617), (0.551659141, 28.948107359), (0.471915914, 28.876592887), (0.399617138, 28.798294313), (0.33735519, 28.714429678), (0.283648704, 28.627020109), (0.239982145, 28.535335268), (0.205979292, 28.439410203), (0.181383246, 28.3396861), (0.167694836, 28.235494232), (0.165417558, 28.164839139), (0.164254691, 28.128759922)],
                knots=[0, 0, 0, 0, 1.129588631, 2.206414736, 3.251139165, 4.268635594, 5.265702196, 6.250456724, 7.242448911, 8.251968645, 9.246821453, 10.222880186, 11.173611482, 12.116736599, 13.062300278, 14.020270554, 14.989073742, 16, 16, 16, 16], degree=3))
            add(Edge.make_bspline(
                [(0.164254691, 28.128759922), (0.16520169, 28.093003404), (0.167058614, 28.022890197), (0.18391986, 27.919567866), (0.209675282, 27.820137588), (0.247987547, 27.725111957), (0.293687723, 27.633042523), (0.354020773, 27.547264175), (0.420872342, 27.462567164), (0.500782455, 27.385457797), (0.586542778, 27.313707901), (0.678166025, 27.250993708), (0.773657869, 27.197341993), (0.874307519, 27.155294262), (0.97868698, 27.120786114), (1.087665913, 27.096502688), (1.201320111, 27.082773797), (1.278309232, 27.080493552), (1.317566657, 27.079330835)],
                knots=[0, 0, 0, 0, 0.989467248, 1.94019797, 2.891935182, 3.827694429, 4.772920941, 5.730924762, 6.725747692, 7.756678648, 8.79901574, 9.819492441, 10.826891316, 11.826466727, 12.835195252, 13.867842842, 14.912794438, 16, 16, 16, 16], degree=3))
            add(Edge.make_bspline(
                [(1.317566657, 27.079330835), (1.356824018, 27.080493643), (1.433813013, 27.082774067), (1.547468125, 27.096501662), (1.656443678, 27.120789879), (1.760835423, 27.155280615), (1.86143973, 27.19739262), (1.956848059, 27.250659927), (2.047604819, 27.314093582), (2.13342144, 27.385335181), (2.212998942, 27.463006041), (2.281453876, 27.546508121), (2.33993924, 27.633735796), (2.387464737, 27.724749273), (2.425355023, 27.820195046), (2.451241051, 27.919552474), (2.468067476, 28.022894227), (2.469929184, 28.093004765), (2.470878623, 28.128759922)],
                knots=[0, 0, 0, 0, 1.087397944, 2.132534446, 3.165364764, 4.174271784, 5.174024072, 6.181601208, 7.194203697, 8.236725232, 9.267838612, 10.269026844, 11.221737037, 12.171628256, 13.107553087, 14.05945871, 15.010357665, 16, 16, 16, 16], degree=3))
            add(Edge.make_bspline(
                [(2.470878623, 28.128759922), (2.470046632, 28.164886207), (2.468413705, 28.235790356), (2.449944355, 28.339639493), (2.424329099, 28.439916888), (2.385649993, 28.535992311), (2.335399503, 28.62748663), (2.274192447, 28.714862026), (2.203386061, 28.798788385), (2.121595733, 28.87674644), (2.032559308, 28.948028332), (1.937890506, 29.010953137), (1.838848689, 29.064058757), (1.735534276, 29.108368304), (1.626763489, 29.140344295), (1.514292381, 29.165522413), (1.396682455, 29.178920939), (1.316889249, 29.181244836), (1.276225511, 29.182429126)],
                knots=[0, 0, 0, 0, 0.978206639, 1.919901502, 2.851605144, 3.780102724, 4.718870031, 5.675451981, 6.667674623, 7.690630536, 8.733308323, 9.756129687, 10.767539656, 11.776269907, 12.797430371, 13.836405707, 14.897401972, 16, 16, 16, 16], degree=3))
        make_face(mode=Mode.SUBTRACT)
    extrude(amount=BOSS_EXTRUDE2_DEPTH)


solid = part.part
